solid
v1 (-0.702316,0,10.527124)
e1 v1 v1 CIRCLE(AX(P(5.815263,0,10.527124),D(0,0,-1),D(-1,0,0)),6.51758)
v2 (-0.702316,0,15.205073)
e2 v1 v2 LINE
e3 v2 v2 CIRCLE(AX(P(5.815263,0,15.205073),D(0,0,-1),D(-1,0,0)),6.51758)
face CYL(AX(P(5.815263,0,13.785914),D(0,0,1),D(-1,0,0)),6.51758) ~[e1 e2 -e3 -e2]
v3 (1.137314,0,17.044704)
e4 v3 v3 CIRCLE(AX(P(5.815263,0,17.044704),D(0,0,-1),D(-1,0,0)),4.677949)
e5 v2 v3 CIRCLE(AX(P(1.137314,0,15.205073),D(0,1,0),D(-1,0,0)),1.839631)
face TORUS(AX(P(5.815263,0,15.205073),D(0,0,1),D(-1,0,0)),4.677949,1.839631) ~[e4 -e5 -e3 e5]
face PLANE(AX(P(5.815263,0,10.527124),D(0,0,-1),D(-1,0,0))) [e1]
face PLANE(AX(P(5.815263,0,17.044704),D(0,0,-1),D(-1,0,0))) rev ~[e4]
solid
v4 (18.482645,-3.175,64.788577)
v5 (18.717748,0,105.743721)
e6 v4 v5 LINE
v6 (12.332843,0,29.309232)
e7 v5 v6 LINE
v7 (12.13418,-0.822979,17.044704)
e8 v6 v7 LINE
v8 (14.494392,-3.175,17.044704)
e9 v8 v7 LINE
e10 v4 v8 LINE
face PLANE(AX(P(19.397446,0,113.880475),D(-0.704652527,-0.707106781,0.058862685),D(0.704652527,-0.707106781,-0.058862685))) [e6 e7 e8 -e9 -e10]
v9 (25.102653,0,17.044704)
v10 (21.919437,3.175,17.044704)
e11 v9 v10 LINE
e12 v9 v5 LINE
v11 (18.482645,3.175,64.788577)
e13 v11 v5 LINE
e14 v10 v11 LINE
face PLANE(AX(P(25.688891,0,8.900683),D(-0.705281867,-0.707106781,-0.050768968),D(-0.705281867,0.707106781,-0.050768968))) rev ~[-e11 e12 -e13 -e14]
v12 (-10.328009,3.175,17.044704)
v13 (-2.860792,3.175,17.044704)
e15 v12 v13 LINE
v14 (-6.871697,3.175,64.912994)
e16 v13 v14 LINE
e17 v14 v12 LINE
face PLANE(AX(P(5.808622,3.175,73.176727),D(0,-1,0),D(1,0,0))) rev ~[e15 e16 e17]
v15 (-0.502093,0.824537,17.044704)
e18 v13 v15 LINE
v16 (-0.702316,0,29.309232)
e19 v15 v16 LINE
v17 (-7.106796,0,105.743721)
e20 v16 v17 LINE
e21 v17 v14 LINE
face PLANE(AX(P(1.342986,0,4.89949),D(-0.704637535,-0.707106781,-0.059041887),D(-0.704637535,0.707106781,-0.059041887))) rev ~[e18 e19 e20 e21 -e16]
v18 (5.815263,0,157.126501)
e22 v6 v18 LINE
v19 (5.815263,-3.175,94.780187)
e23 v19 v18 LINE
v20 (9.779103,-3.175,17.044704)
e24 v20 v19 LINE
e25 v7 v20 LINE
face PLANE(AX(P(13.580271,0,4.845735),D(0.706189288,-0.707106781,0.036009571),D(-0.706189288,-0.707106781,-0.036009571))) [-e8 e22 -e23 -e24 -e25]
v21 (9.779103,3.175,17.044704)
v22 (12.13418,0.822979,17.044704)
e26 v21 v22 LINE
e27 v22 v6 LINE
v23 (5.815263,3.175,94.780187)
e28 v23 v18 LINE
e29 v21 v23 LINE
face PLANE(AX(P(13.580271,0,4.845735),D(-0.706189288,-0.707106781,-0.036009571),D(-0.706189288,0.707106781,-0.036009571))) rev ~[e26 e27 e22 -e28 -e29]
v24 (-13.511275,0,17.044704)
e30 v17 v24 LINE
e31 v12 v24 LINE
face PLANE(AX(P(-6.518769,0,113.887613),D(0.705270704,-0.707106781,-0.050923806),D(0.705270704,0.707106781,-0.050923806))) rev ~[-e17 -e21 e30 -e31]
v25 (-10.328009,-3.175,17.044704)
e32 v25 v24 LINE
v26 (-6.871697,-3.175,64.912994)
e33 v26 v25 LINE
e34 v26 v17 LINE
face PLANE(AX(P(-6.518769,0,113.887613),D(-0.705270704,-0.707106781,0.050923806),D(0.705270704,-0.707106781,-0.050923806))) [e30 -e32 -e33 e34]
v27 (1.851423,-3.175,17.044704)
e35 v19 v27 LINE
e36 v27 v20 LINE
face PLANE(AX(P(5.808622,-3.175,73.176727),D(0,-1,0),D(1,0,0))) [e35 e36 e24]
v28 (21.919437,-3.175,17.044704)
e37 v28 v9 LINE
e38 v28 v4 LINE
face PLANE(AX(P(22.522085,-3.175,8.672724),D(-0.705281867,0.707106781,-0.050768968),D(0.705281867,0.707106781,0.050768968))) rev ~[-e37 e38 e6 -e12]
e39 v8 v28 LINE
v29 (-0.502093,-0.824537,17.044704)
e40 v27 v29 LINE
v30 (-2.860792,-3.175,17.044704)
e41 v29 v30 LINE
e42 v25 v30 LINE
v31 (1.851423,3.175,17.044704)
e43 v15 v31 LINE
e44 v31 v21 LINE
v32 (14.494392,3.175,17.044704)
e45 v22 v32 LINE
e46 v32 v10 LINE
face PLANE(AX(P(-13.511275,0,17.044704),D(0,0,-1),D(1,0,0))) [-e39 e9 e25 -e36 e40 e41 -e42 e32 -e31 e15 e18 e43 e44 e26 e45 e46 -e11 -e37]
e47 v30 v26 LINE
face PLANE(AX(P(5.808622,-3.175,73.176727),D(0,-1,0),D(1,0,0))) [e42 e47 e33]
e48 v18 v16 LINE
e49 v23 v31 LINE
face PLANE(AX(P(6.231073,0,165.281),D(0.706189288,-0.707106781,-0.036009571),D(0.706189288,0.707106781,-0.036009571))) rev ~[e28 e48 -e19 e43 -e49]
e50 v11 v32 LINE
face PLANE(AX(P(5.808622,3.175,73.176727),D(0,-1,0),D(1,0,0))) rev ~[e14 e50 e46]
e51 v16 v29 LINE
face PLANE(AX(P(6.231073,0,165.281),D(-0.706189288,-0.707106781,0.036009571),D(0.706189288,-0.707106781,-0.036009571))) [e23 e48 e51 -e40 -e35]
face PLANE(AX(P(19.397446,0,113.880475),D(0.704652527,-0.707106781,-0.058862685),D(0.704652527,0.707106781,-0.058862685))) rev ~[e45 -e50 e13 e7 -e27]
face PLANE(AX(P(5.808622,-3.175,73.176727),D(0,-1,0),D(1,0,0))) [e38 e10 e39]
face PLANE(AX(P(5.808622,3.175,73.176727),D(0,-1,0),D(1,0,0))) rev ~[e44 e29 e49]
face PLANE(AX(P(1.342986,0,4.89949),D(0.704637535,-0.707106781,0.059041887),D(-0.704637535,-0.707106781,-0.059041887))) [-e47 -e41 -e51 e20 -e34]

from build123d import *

# Parameters (mm, degrees)
F1_DEPTH     = 3.175
F0_W         = 6.517579814
F0_H         = 6.517579814
F3_R         = 1.8396307345
F4_T1_DEPTH  = 105.2601198415
F4_T3_DEPTH  = 105.2587122864
F4_T8_DEPTH  = 160.6437057027
F4_T13_DEPTH = 160.6437057027
F4_T18_DEPTH = 109.3610790882
F4_T23_DEPTH = 109.3627110349
F4_T28_DEPTH = 109.3610790882
F4_T33_DEPTH = 160.6437057027
F4_T38_DEPTH = 160.6437057027
F4_T43_DEPTH = 109.3627110349
F4_T49_DEPTH = 109.3627110349
F4_T53_DEPTH = 160.6437057027
F4_T60_DEPTH = 160.6437057027
F4_T64_DEPTH = 109.3610790882
F4_T71_DEPTH = 160.6437057027
F4_T75_DEPTH = 109.3610790882
F4_T82_DEPTH = 109.3627110349
F4_T86_DEPTH = 160.6437057027


# Not quite as in the source:
# - a fillet or chamfer that OpenCascade refuses, or shapes differently, is made with other operations: its cross-section is extruded or revolved along the edge and cut away or added


with BuildPart() as f1:
    # F0 (on Front) → F1 (new body, symmetric)
    with BuildSketch(Plane.XZ):
        Polygon((5.8152633182, 17.0447041894), (12.3328431322, 17.0447041894), (25.1026526093, 17.0447041894), (18.7177478708, 105.7437211275), (12.3328431322, 29.3092317879), (5.8152633182, 157.1265012026), (-0.7023164958, 29.3092317879), (-7.1067957186, 105.7437211275), (-13.5112749413, 17.0447041894), (-0.7023164958, 17.0447041894), align=None)
    extrude(amount=F1_DEPTH, both=True)

    # F4: chamfer of 3.175 on 12 edges, made by hand

    # F4_s2 → F4_t1 (cut)
    with BuildSketch(Plane(origin=(8.146753536, 0, 112.828694536), x_dir=(0, 1, 0), z_dir=(-0.0720171377, 0, -0.9974033948))):
        Polygon((0, -14.7037023029), (-3.175, -11.5287023029), (-3.175, -14.7037023029), align=None)
        Polygon((0, -14.7037023029), (3.175, -11.5287023029), (3.175, -14.7037023029), align=None)
    extrude(amount=F4_T1_DEPTH, mode=Mode.SUBTRACT)

    # F4_s4 → F4_t3 (cut)
    with BuildSketch(Plane(origin=(-0.5049778086, 0, 7.0151454149), x_dir=(0, 1, 0), z_dir=(-0.0717981628, 0, 0.9974191816))):
        Polygon((-3.175, -23.0866456679), (0, -26.2616456679), (-3.175, -26.2616456679), align=None)
        Polygon((0, -26.2616456679), (3.175, -23.0866456679), (3.175, -26.2616456679), align=None)
    extrude(amount=F4_T3_DEPTH, mode=Mode.SUBTRACT)


with BuildPart() as f2:
    # F0 (on Front) → F2 (revolve)
    with BuildSketch(Plane.XZ):
        with Locations((2.5564734112, 13.7859142824)):
            Rectangle(F0_W, F0_H)
    revolve(axis=Axis((5.8152633182, 0, 13.7859142824), (0, 0, -1)))

    # F3
    f3_edges = [f2.edges().sort_by_distance(p)[0] for p in [
        (12.332843, 0, 17.044704),
    ]]
    fillet(f3_edges, radius=F3_R)


with BuildPart() as f4_tool6:
    # F4_s7 → F4_t8 (new body)
    with BuildSketch(Plane(origin=(8.4222101757, 0, 165.1692710805), x_dir=(0, 1, 0), z_dir=(-0.0509252238, 0, -0.998702469))):
        Polygon((0, -2.193984407), (-3.175, 0.981015593), (-3.175, -2.193984407), align=None)
    extrude(amount=F4_T8_DEPTH)

    split(bisect_by=Plane(origin=(1.7412915039, 0, 0.1459035751), x_dir=(0, 1, 0), z_dir=(0.9965079584, 0, 0.0834978368)), keep=Keep.TOP)


with BuildPart() as f1_1:
    add(f1.part)

    # F4_t5: cut F4_tool6
    add(f4_tool6.part, mode=Mode.SUBTRACT)


with BuildPart() as f4_tool11:
    # F4_s12 → F4_t13 (new body)
    with BuildSketch(Plane(origin=(-0.2112311518, 0, 4.1424869054), x_dir=(0, 1, 0), z_dir=(-0.0509252238, 0, 0.998702469))):
        Polygon((0, -13.8094200745), (-3.175, -10.6344200745), (-3.175, -13.8094200745), align=None)
    extrude(amount=F4_T13_DEPTH)

    split(bisect_by=Plane(origin=(9.8160197033, 0, -0.8199747425), x_dir=(0, 1, 0), z_dir=(-0.996529161, 0, 0.0832444073)), keep=Keep.TOP)


with BuildPart() as f1_2:
    add(f1_1.part)

    # F4_t10: cut F4_tool11
    add(f4_tool11.part, mode=Mode.SUBTRACT)


with BuildPart() as f4_tool16:
    # F4_s17 → F4_t18 (new body)
    with BuildSketch(Plane(origin=(9.5814265353, 0, 114.7004496316), x_dir=(0, 1, 0), z_dir=(-0.0832444073, 0, -0.996529161))):
        Polygon((0, 9.8502081904), (-3.175, 13.0252081904), (-3.175, 9.8502081904), align=None)
    extrude(amount=F4_T18_DEPTH)

    split(bisect_by=Plane(origin=(13.7915019238, 0, 0.703247808), x_dir=(0, 1, 0), z_dir=(0.998702469, 0, 0.0509252238)), keep=Keep.TOP)


with BuildPart() as f1_3:
    add(f1_2.part)

    # F4_t15: cut F4_tool16
    add(f4_tool16.part, mode=Mode.SUBTRACT)


with BuildPart() as f4_tool21:
    # F4_s22 → F4_t23 (new body)
    with BuildSketch(Plane(origin=(-0.39830507, 0, 4.7535862896), x_dir=(0, 1, 0), z_dir=(-0.0834978368, 0, 0.9965079584))):
        Polygon((0, -1.7473934745), (-3.175, 1.4276065255), (-3.175, -1.7473934745), align=None)
    extrude(amount=F4_T23_DEPTH)

    split(bisect_by=Plane(origin=(-2.1911376442, 0, 0.111729147), x_dir=(0, 1, 0), z_dir=(-0.998702469, 0, 0.0509252238)), keep=Keep.TOP)


with BuildPart() as f1_4:
    add(f1_3.part)

    # F4_t20: cut F4_tool21
    add(f4_tool21.part, mode=Mode.SUBTRACT)


with BuildPart() as f4_tool26:
    # F4_s27 → F4_t28 (new body)
    with BuildSketch(Plane(origin=(9.5814265353, 0, 114.7004496316), x_dir=(0, 1, 0), z_dir=(-0.0832444073, 0, -0.996529161))):
        Polygon((0, 9.8502081904), (3.175, 13.0252081904), (3.175, 9.8502081904), align=None)
    extrude(amount=F4_T28_DEPTH)

    split(bisect_by=Plane(origin=(13.7915019238, 0, 0.703247808), x_dir=(0, 1, 0), z_dir=(0.998702469, 0, 0.0509252238)), keep=Keep.TOP)


with BuildPart() as f1_5:
    add(f1_4.part)

    # F4_t25: cut F4_tool26
    add(f4_tool26.part, mode=Mode.SUBTRACT)


with BuildPart() as f4_tool31:
    # F4_s32 → F4_t33 (new body)
    with BuildSketch(Plane(origin=(-0.2112311518, 0, 4.1424869054), x_dir=(0, 1, 0), z_dir=(-0.0509252238, 0, 0.998702469))):
        Polygon((0, -13.8094200745), (3.175, -10.6344200745), (3.175, -13.8094200745), align=None)
    extrude(amount=F4_T33_DEPTH)

    split(bisect_by=Plane(origin=(9.8160197033, 0, -0.8199747425), x_dir=(0, 1, 0), z_dir=(-0.996529161, 0, 0.0832444073)), keep=Keep.TOP)


with BuildPart() as f1_6:
    add(f1_5.part)

    # F4_t30: cut F4_tool31
    add(f4_tool31.part, mode=Mode.SUBTRACT)


with BuildPart() as f4_tool36:
    # F4_s37 → F4_t38 (new body)
    with BuildSketch(Plane(origin=(8.4222101757, 0, 165.1692710805), x_dir=(0, 1, 0), z_dir=(-0.0509252238, 0, -0.998702469))):
        Polygon((0, -2.193984407), (3.175, 0.981015593), (3.175, -2.193984407), align=None)
    extrude(amount=F4_T38_DEPTH)

    split(bisect_by=Plane(origin=(1.7412915039, 0, 0.1459035751), x_dir=(0, 1, 0), z_dir=(0.9965079584, 0, 0.0834978368)), keep=Keep.TOP)


with BuildPart() as f1_7:
    add(f1_6.part)

    # F4_t35: cut F4_tool36
    add(f4_tool36.part, mode=Mode.SUBTRACT)


with BuildPart() as f4_tool41:
    # F4_s42 → F4_t43 (new body)
    with BuildSketch(Plane(origin=(-0.39830507, 0, 4.7535862896), x_dir=(0, 1, 0), z_dir=(-0.0834978368, 0, 0.9965079584))):
        Polygon((0, -1.7473934745), (3.175, 1.4276065255), (3.175, -1.7473934745), align=None)
    extrude(amount=F4_T43_DEPTH)

    split(bisect_by=Plane(origin=(-2.1911376442, 0, 0.111729147), x_dir=(0, 1, 0), z_dir=(-0.998702469, 0, 0.0509252238)), keep=Keep.TOP)


with BuildPart() as f1_8:
    add(f1_7.part)

    # F4_t40: cut F4_tool41
    add(f4_tool41.part, mode=Mode.SUBTRACT)


with BuildPart() as f4_tool47:
    # F4_s48 → F4_t49 (new body)
    with BuildSketch(Plane(origin=(-0.39830507, 0, 4.7535862896), x_dir=(0, 1, 0), z_dir=(-0.0834978368, 0, 0.9965079584))):
        Polygon((0, -1.7473934745), (-3.175, 1.4276065255), (-3.175, -1.7473934745), align=None)
    extrude(amount=F4_T49_DEPTH)

    split(bisect_by=Plane(origin=(-2.1911376442, 0, 0.111729147), x_dir=(0, 1, 0), z_dir=(0.998702469, 0, -0.0509252238)), keep=Keep.TOP)


with BuildPart() as f4_tool51:
    # F4_s52 → F4_t53 (new body)
    with BuildSketch(Plane(origin=(8.4222101757, 0, 165.1692710805), x_dir=(0, 1, 0), z_dir=(-0.0509252238, 0, -0.998702469))):
        Polygon((0, -2.193984407), (-3.175, 0.981015593), (-3.175, -2.193984407), align=None)
    extrude(amount=F4_T53_DEPTH)

    split(bisect_by=Plane(origin=(1.7412915039, 0, 0.1459035751), x_dir=(0, 1, 0), z_dir=(-0.9965079584, 0, -0.0834978368)), keep=Keep.TOP)


with BuildPart() as f4_tool47_1:
    add(f4_tool47.part)

    # F4_t55: intersect F4_tool51
    add(f4_tool51.part, mode=Mode.INTERSECT)


with BuildPart() as f1_9:
    add(f1_8.part)

    # F4_t45: cut F4_tool47
    add(f4_tool47_1.part, mode=Mode.SUBTRACT)


with BuildPart() as f4_tool58:
    # F4_s59 → F4_t60 (new body)
    with BuildSketch(Plane(origin=(-0.2112311518, 0, 4.1424869054), x_dir=(0, 1, 0), z_dir=(-0.0509252238, 0, 0.998702469))):
        Polygon((0, -13.8094200745), (-3.175, -10.6344200745), (-3.175, -13.8094200745), align=None)
    extrude(amount=F4_T60_DEPTH)

    split(bisect_by=Plane(origin=(9.8160197033, 0, -0.8199747425), x_dir=(0, 1, 0), z_dir=(0.996529161, 0, -0.0832444073)), keep=Keep.TOP)


with BuildPart() as f4_tool62:
    # F4_s63 → F4_t64 (new body)
    with BuildSketch(Plane(origin=(9.5814265353, 0, 114.7004496316), x_dir=(0, 1, 0), z_dir=(-0.0832444073, 0, -0.996529161))):
        Polygon((0, 9.8502081904), (-3.175, 13.0252081904), (-3.175, 9.8502081904), align=None)
    extrude(amount=F4_T64_DEPTH)

    split(bisect_by=Plane(origin=(13.7915019238, 0, 0.703247808), x_dir=(0, 1, 0), z_dir=(-0.998702469, 0, -0.0509252238)), keep=Keep.TOP)


with BuildPart() as f4_tool58_1:
    add(f4_tool58.part)

    # F4_t66: intersect F4_tool62
    add(f4_tool62.part, mode=Mode.INTERSECT)


with BuildPart() as f1_10:
    add(f1_9.part)

    # F4_t56: cut F4_tool58
    add(f4_tool58_1.part, mode=Mode.SUBTRACT)


with BuildPart() as f4_tool69:
    # F4_s70 → F4_t71 (new body)
    with BuildSketch(Plane(origin=(-0.2112311518, 0, 4.1424869054), x_dir=(0, 1, 0), z_dir=(-0.0509252238, 0, 0.998702469))):
        Polygon((0, -13.8094200745), (3.175, -10.6344200745), (3.175, -13.8094200745), align=None)
    extrude(amount=F4_T71_DEPTH)

    split(bisect_by=Plane(origin=(9.8160197033, 0, -0.8199747425), x_dir=(0, 1, 0), z_dir=(0.996529161, 0, -0.0832444073)), keep=Keep.TOP)


with BuildPart() as f4_tool73:
    # F4_s74 → F4_t75 (new body)
    with BuildSketch(Plane(origin=(9.5814265353, 0, 114.7004496316), x_dir=(0, 1, 0), z_dir=(-0.0832444073, 0, -0.996529161))):
        Polygon((0, 9.8502081904), (3.175, 13.0252081904), (3.175, 9.8502081904), align=None)
    extrude(amount=F4_T75_DEPTH)

    split(bisect_by=Plane(origin=(13.7915019238, 0, 0.703247808), x_dir=(0, 1, 0), z_dir=(-0.998702469, 0, -0.0509252238)), keep=Keep.TOP)


with BuildPart() as f4_tool69_1:
    add(f4_tool69.part)

    # F4_t77: intersect F4_tool73
    add(f4_tool73.part, mode=Mode.INTERSECT)


with BuildPart() as f1_11:
    add(f1_10.part)

    # F4_t67: cut F4_tool69
    add(f4_tool69_1.part, mode=Mode.SUBTRACT)


with BuildPart() as f4_tool80:
    # F4_s81 → F4_t82 (new body)
    with BuildSketch(Plane(origin=(-0.39830507, 0, 4.7535862896), x_dir=(0, 1, 0), z_dir=(-0.0834978368, 0, 0.9965079584))):
        Polygon((0, -1.7473934745), (3.175, 1.4276065255), (3.175, -1.7473934745), align=None)
    extrude(amount=F4_T82_DEPTH)

    split(bisect_by=Plane(origin=(-2.1911376442, 0, 0.111729147), x_dir=(0, 1, 0), z_dir=(0.998702469, 0, -0.0509252238)), keep=Keep.TOP)


with BuildPart() as f4_tool84:
    # F4_s85 → F4_t86 (new body)
    with BuildSketch(Plane(origin=(8.4222101757, 0, 165.1692710805), x_dir=(0, 1, 0), z_dir=(-0.0509252238, 0, -0.998702469))):
        Polygon((0, -2.193984407), (3.175, 0.981015593), (3.175, -2.193984407), align=None)
    extrude(amount=F4_T86_DEPTH)

    split(bisect_by=Plane(origin=(1.7412915039, 0, 0.1459035751), x_dir=(0, 1, 0), z_dir=(-0.9965079584, 0, -0.0834978368)), keep=Keep.TOP)


with BuildPart() as f4_tool80_1:
    add(f4_tool80.part)

    # F4_t88: intersect F4_tool84
    add(f4_tool84.part, mode=Mode.INTERSECT)


with BuildPart() as f1_12:
    add(f1_11.part)

    # F4_t78: cut F4_tool80
    add(f4_tool80_1.part, mode=Mode.SUBTRACT)


solid = Compound([f2.part, f1_12.part])
